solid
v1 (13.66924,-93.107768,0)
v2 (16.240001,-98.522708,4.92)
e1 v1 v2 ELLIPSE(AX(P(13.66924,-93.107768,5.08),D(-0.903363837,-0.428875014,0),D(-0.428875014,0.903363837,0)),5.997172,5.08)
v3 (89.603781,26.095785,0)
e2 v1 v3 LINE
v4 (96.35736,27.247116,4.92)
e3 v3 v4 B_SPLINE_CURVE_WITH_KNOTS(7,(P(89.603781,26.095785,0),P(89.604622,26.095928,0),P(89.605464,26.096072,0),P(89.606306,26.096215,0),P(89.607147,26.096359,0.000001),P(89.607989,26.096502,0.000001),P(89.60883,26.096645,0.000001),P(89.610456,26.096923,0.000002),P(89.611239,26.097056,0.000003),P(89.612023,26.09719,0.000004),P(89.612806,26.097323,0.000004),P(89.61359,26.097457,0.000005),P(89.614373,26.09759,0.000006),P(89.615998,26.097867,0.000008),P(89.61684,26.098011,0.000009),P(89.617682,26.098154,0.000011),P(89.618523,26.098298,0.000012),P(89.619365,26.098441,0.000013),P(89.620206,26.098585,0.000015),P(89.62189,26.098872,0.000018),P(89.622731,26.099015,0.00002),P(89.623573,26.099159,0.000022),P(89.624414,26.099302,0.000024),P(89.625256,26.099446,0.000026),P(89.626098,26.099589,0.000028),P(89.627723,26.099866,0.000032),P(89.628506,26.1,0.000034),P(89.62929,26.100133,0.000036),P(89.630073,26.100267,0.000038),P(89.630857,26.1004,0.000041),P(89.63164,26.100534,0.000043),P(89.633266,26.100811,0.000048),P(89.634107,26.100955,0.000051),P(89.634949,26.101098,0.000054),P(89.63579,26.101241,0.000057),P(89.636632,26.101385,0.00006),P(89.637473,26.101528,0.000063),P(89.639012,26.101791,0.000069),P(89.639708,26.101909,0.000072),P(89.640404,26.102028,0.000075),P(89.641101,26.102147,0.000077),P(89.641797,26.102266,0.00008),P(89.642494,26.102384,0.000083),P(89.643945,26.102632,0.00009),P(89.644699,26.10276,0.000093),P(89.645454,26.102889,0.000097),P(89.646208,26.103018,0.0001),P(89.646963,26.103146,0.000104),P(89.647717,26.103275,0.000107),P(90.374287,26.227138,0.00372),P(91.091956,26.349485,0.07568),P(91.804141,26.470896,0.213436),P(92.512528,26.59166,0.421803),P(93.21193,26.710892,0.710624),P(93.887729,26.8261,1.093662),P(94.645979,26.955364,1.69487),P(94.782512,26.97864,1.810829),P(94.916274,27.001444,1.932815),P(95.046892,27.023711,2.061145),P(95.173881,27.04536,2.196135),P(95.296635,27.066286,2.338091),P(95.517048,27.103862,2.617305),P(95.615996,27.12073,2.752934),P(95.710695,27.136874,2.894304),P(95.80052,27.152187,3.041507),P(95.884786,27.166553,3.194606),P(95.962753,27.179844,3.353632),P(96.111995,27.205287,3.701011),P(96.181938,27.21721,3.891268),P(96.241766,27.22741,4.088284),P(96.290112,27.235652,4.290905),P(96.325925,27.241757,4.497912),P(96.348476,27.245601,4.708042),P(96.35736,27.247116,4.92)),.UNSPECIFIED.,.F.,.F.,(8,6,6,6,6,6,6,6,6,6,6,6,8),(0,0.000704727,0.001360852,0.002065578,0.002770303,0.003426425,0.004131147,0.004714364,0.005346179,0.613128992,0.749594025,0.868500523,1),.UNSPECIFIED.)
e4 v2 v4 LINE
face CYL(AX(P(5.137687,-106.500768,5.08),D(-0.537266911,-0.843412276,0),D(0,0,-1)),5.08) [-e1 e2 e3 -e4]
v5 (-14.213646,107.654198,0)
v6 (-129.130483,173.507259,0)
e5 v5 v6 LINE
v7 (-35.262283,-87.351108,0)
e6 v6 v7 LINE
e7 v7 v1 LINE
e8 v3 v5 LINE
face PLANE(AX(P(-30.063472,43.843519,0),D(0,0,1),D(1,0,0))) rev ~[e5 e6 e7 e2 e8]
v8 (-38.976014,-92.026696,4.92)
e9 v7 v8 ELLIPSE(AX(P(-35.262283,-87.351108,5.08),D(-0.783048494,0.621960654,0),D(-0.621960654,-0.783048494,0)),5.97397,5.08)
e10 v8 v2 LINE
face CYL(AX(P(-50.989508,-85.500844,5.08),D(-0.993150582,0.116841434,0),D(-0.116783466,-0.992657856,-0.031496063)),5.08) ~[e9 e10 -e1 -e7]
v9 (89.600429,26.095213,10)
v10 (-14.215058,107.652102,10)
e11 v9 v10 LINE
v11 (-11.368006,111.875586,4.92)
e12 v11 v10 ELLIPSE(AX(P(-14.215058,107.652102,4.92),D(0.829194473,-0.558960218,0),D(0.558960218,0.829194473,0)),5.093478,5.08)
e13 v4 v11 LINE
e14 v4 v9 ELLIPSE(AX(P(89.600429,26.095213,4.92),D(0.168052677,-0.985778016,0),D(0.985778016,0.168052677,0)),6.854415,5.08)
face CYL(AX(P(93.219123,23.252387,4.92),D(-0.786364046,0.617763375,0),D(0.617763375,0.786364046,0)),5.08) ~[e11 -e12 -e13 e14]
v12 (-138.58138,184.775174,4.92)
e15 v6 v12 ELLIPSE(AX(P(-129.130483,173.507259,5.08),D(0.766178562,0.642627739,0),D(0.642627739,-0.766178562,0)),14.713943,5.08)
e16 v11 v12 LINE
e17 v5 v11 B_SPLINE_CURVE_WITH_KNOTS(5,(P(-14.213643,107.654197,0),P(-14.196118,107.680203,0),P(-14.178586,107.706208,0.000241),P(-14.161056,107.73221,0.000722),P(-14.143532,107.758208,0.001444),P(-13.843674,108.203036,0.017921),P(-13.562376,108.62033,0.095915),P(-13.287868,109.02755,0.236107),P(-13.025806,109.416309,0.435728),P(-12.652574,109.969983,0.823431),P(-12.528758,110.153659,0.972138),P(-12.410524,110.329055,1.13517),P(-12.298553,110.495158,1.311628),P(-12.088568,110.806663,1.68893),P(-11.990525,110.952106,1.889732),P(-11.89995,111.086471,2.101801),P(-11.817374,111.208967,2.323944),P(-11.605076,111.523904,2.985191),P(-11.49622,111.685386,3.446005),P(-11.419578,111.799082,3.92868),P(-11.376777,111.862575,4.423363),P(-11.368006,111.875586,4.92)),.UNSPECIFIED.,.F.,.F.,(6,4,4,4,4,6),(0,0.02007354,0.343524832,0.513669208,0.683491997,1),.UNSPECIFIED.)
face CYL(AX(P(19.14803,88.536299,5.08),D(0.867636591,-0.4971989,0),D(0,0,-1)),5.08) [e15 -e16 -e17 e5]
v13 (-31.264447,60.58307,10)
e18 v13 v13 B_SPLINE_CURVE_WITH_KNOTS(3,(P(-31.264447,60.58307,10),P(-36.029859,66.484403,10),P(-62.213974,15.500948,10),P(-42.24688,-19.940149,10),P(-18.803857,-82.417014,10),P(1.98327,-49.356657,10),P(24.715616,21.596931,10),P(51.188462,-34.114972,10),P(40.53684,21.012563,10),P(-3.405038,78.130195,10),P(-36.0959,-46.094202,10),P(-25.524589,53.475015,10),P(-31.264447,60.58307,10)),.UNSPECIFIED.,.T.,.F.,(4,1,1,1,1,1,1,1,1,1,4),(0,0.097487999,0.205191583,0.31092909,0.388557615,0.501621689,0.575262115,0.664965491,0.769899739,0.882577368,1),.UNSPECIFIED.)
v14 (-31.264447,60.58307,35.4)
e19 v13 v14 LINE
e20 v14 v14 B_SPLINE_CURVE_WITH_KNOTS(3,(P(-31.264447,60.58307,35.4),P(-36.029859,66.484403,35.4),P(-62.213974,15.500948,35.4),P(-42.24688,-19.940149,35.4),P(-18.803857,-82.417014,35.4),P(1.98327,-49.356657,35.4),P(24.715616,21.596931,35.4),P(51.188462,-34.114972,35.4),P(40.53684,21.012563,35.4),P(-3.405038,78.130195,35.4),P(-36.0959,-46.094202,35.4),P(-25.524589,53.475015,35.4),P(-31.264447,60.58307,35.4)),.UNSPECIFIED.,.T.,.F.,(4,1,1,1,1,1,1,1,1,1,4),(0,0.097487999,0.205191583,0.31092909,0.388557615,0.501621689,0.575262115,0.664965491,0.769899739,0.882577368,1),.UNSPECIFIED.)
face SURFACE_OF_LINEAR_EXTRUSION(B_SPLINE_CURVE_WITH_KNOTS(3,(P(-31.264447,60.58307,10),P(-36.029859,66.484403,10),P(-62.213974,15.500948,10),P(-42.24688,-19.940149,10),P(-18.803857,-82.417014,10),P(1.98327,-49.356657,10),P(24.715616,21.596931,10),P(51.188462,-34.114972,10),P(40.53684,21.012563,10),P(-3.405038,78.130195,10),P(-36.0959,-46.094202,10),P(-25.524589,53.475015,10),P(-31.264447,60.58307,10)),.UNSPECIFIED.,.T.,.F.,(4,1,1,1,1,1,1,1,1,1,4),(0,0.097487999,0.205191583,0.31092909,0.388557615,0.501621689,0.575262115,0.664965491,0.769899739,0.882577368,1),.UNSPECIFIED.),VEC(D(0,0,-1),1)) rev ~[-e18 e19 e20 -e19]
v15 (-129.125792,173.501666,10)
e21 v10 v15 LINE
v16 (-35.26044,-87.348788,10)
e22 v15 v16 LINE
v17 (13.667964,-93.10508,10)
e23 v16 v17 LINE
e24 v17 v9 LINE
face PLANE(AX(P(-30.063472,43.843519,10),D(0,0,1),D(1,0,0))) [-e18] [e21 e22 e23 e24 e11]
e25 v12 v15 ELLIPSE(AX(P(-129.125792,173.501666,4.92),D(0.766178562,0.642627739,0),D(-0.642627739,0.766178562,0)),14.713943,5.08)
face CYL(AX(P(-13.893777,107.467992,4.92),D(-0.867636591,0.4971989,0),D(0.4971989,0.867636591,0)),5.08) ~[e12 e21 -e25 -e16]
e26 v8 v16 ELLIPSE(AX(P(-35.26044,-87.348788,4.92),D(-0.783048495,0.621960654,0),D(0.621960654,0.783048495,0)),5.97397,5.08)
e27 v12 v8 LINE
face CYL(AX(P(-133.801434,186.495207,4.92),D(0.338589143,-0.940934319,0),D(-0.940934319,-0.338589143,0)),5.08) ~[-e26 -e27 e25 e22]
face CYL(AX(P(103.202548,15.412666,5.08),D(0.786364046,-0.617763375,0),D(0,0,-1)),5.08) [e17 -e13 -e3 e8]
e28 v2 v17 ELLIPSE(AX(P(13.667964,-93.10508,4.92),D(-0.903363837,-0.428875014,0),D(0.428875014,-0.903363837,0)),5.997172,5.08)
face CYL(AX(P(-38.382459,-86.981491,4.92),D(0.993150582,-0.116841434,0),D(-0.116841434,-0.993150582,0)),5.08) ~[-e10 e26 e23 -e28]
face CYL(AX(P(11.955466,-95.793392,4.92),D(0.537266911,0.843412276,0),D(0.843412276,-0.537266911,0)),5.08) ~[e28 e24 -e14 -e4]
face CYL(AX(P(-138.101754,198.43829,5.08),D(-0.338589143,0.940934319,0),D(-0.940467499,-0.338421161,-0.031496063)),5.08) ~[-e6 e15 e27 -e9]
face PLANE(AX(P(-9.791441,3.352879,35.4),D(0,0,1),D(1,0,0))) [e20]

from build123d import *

# Parameters (mm, degrees)
F1_DEPTH    = 10
F2_R        = 5.08
F3_T1_DEPTH = 80.9842186748
F3_T3_DEPTH = 174.5076181059
F3_T5_DEPTH = 187.7665216843
F3_T7_DEPTH = 197.3953695309
F3_T9_DEPTH = 319.5650724593
F5_DEPTH    = 25.4


# Not quite as in the source:
# - a fillet or chamfer that OpenCascade refuses, or shapes differently, is made with other operations: its cross-section is extruded or revolved along the edge and cut away or added


with BuildPart() as f1:
    # F0 (on Top) → F1 (new body)
    with BuildSketch(Plane.XY):
        Polygon((96.3573604822, 27.2471159697), (-11.3680064678, 111.8755862117), (-138.5813802481, 184.7751736641), (-38.9760136604, -92.0266956091), (16.2400007248, -98.5227078199), align=None)
    extrude(amount=F1_DEPTH)

    # F2
    f2_edges = [f1.edges().sort_by_distance(p)[0] for p in [
        (-11.368006, -95.274702, 10),
        (56.298681, -35.637796, 10),
        (42.494677, 69.561351, 10),
        (-74.974693, 148.32538, 10),
        (-88.778697, 46.374239, 10),
    ]]
    fillet(f2_edges, radius=F2_R)

    # F3: fillet of radius 5.08 on 5 edges, made by hand

    # F3_s2 → F3_t1 (cut)
    with BuildSketch(Plane(origin=(-40.3717884669, 4.7496298633, 0), x_dir=(0, 0, 1), z_dir=(0.9931505824, -0.1168414342, 0))):
        with BuildLine():
            ThreePointArc((4.92, 95.9503796722), (1.4317675513, 94.4079813111), (0, 90.8728999824))
            Line((0, 90.8728999824), (-0.1016, 90.8728999824))
            Line((-0.1016, 90.8728999824), (-0.1016, 95.9503796722))
            Line((-0.1016, 95.9503796722), (0, 96.0519796722))
            ThreePointArc((0, 96.0519796722), (2.46, 96.0519796722), (4.9168, 96.051929266))
            Line((4.9168, 96.051929266), (4.92, 95.9503796722))
        make_face()
    extrude(amount=F3_T1_DEPTH, mode=Mode.SUBTRACT)

    # F3_s4 → F3_t3 (cut)
    with BuildSketch(Plane(origin=(-46.7764695351, -73.4306316227, 0), x_dir=(0, 0, 1), z_dir=(0.5372669108, 0.8434122755, 0))):
        with BuildLine():
            ThreePointArc((0, 61.5525271533), (1.4317675513, 65.0876084819), (4.92, 66.630006843))
            Line((4.92, 66.630006843), (4.9168, 66.7315564368))
            ThreePointArc((4.9168, 66.7315564368), (2.46, 66.731606843), (0, 66.731606843))
            Line((0, 66.731606843), (-0.1016, 66.630006843))
            Line((-0.1016, 66.630006843), (-0.1016, 61.5525271533))
            Line((-0.1016, 61.5525271533), (0, 61.5525271533))
        make_face()
    extrude(amount=F3_T3_DEPTH, mode=Mode.SUBTRACT)

    # F3_s6 → F3_t5 (cut)
    with BuildSketch(Plane(origin=(56.3299245333, -44.2524864577, 0), x_dir=(0, 0, 1), z_dir=(-0.7863640458, 0.6177633749, 0))):
        with BuildLine():
            ThreePointArc((0, 75.8747208727), (1.4317675513, 79.4098022013), (4.92, 80.9522005625))
            Line((4.92, 80.9522005625), (4.9168, 81.0537501563))
            ThreePointArc((4.9168, 81.0537501563), (2.46, 81.0538005625), (0, 81.0538005625))
            Line((0, 81.0538005625), (-0.1016, 80.9522005625))
            Line((-0.1016, 80.9522005625), (-0.1016, 75.8747208727))
            Line((-0.1016, 75.8747208727), (0, 75.8747208727))
        make_face()
    extrude(amount=F3_T5_DEPTH, mode=Mode.SUBTRACT)

    # F3_s8 → F3_t7 (cut)
    with BuildSketch(Plane(origin=(-23.7789855791, 13.6265408836, 0), x_dir=(0, 0, 1), z_dir=(-0.8676365908, 0.4971989001, 0))):
        with BuildLine():
            ThreePointArc((0, 86.3377122117), (1.4317675513, 89.8727935404), (4.92, 91.4151919015))
            Line((4.92, 91.4151919015), (4.9168, 91.5167414953))
            ThreePointArc((4.9168, 91.5167414953), (2.46, 91.5167919015), (0, 91.5167919015))
            Line((0, 91.5167919015), (-0.1016, 91.4151919015))
            Line((-0.1016, 91.4151919015), (-0.1016, 86.3377122117))
            Line((-0.1016, 86.3377122117), (0, 86.3377122117))
        make_face()
    extrude(amount=F3_T7_DEPTH, mode=Mode.SUBTRACT)

    # F3_s10 → F3_t9 (cut)
    with BuildSketch(Plane(origin=(-79.0528289065, 219.6866651096, 0), x_dir=(0, 0, 1), z_dir=(0.3385891432, -0.9409343187, 0))):
        with BuildLine():
            ThreePointArc((4.92, 67.8331088759), (1.4317675513, 66.2907105148), (0, 62.7556291862))
            Line((0, 62.7556291862), (-0.1016, 62.7556291862))
            Line((-0.1016, 62.7556291862), (-0.1016, 67.8331088759))
            Line((-0.1016, 67.8331088759), (0, 67.9347088759))
            ThreePointArc((0, 67.9347088759), (2.46, 67.9347088759), (4.9168, 67.9346584697))
            Line((4.9168, 67.9346584697), (4.92, 67.8331088759))
        make_face()
    extrude(amount=F3_T9_DEPTH, mode=Mode.SUBTRACT)

    # F4 (on face) → F5 (join)
    with BuildSketch(Plane.XY.offset(10)):
        with BuildLine():
            add(Edge.make_bspline(
                [(-31.2644466758, 60.5830699205), (-36.0298589944, 66.4844032809), (-62.2139736916, 15.5009480269), (-42.2468798531, -19.940148882), (-18.8038565995, -82.4170143142), (1.9832701602, -49.3566571297), (24.7156161179, 21.5969310396), (51.1884621444, -34.1149723312), (40.5368400052, 21.0125630517), (-3.4050375117, 78.1301949532), (-36.095899728, -46.0942022167), (-25.5245888635, 53.4750145988), (-31.2644466758, 60.5830699205)],
                knots=[0, 0, 0, 0, 0.0974879994, 0.205191583, 0.3109290902, 0.3885576148, 0.5016216887, 0.5752621146, 0.664965491, 0.7698997389, 0.8825773684, 1, 1, 1, 1], degree=3))
        make_face()
    extrude(amount=F5_DEPTH)


solid = f1.part
